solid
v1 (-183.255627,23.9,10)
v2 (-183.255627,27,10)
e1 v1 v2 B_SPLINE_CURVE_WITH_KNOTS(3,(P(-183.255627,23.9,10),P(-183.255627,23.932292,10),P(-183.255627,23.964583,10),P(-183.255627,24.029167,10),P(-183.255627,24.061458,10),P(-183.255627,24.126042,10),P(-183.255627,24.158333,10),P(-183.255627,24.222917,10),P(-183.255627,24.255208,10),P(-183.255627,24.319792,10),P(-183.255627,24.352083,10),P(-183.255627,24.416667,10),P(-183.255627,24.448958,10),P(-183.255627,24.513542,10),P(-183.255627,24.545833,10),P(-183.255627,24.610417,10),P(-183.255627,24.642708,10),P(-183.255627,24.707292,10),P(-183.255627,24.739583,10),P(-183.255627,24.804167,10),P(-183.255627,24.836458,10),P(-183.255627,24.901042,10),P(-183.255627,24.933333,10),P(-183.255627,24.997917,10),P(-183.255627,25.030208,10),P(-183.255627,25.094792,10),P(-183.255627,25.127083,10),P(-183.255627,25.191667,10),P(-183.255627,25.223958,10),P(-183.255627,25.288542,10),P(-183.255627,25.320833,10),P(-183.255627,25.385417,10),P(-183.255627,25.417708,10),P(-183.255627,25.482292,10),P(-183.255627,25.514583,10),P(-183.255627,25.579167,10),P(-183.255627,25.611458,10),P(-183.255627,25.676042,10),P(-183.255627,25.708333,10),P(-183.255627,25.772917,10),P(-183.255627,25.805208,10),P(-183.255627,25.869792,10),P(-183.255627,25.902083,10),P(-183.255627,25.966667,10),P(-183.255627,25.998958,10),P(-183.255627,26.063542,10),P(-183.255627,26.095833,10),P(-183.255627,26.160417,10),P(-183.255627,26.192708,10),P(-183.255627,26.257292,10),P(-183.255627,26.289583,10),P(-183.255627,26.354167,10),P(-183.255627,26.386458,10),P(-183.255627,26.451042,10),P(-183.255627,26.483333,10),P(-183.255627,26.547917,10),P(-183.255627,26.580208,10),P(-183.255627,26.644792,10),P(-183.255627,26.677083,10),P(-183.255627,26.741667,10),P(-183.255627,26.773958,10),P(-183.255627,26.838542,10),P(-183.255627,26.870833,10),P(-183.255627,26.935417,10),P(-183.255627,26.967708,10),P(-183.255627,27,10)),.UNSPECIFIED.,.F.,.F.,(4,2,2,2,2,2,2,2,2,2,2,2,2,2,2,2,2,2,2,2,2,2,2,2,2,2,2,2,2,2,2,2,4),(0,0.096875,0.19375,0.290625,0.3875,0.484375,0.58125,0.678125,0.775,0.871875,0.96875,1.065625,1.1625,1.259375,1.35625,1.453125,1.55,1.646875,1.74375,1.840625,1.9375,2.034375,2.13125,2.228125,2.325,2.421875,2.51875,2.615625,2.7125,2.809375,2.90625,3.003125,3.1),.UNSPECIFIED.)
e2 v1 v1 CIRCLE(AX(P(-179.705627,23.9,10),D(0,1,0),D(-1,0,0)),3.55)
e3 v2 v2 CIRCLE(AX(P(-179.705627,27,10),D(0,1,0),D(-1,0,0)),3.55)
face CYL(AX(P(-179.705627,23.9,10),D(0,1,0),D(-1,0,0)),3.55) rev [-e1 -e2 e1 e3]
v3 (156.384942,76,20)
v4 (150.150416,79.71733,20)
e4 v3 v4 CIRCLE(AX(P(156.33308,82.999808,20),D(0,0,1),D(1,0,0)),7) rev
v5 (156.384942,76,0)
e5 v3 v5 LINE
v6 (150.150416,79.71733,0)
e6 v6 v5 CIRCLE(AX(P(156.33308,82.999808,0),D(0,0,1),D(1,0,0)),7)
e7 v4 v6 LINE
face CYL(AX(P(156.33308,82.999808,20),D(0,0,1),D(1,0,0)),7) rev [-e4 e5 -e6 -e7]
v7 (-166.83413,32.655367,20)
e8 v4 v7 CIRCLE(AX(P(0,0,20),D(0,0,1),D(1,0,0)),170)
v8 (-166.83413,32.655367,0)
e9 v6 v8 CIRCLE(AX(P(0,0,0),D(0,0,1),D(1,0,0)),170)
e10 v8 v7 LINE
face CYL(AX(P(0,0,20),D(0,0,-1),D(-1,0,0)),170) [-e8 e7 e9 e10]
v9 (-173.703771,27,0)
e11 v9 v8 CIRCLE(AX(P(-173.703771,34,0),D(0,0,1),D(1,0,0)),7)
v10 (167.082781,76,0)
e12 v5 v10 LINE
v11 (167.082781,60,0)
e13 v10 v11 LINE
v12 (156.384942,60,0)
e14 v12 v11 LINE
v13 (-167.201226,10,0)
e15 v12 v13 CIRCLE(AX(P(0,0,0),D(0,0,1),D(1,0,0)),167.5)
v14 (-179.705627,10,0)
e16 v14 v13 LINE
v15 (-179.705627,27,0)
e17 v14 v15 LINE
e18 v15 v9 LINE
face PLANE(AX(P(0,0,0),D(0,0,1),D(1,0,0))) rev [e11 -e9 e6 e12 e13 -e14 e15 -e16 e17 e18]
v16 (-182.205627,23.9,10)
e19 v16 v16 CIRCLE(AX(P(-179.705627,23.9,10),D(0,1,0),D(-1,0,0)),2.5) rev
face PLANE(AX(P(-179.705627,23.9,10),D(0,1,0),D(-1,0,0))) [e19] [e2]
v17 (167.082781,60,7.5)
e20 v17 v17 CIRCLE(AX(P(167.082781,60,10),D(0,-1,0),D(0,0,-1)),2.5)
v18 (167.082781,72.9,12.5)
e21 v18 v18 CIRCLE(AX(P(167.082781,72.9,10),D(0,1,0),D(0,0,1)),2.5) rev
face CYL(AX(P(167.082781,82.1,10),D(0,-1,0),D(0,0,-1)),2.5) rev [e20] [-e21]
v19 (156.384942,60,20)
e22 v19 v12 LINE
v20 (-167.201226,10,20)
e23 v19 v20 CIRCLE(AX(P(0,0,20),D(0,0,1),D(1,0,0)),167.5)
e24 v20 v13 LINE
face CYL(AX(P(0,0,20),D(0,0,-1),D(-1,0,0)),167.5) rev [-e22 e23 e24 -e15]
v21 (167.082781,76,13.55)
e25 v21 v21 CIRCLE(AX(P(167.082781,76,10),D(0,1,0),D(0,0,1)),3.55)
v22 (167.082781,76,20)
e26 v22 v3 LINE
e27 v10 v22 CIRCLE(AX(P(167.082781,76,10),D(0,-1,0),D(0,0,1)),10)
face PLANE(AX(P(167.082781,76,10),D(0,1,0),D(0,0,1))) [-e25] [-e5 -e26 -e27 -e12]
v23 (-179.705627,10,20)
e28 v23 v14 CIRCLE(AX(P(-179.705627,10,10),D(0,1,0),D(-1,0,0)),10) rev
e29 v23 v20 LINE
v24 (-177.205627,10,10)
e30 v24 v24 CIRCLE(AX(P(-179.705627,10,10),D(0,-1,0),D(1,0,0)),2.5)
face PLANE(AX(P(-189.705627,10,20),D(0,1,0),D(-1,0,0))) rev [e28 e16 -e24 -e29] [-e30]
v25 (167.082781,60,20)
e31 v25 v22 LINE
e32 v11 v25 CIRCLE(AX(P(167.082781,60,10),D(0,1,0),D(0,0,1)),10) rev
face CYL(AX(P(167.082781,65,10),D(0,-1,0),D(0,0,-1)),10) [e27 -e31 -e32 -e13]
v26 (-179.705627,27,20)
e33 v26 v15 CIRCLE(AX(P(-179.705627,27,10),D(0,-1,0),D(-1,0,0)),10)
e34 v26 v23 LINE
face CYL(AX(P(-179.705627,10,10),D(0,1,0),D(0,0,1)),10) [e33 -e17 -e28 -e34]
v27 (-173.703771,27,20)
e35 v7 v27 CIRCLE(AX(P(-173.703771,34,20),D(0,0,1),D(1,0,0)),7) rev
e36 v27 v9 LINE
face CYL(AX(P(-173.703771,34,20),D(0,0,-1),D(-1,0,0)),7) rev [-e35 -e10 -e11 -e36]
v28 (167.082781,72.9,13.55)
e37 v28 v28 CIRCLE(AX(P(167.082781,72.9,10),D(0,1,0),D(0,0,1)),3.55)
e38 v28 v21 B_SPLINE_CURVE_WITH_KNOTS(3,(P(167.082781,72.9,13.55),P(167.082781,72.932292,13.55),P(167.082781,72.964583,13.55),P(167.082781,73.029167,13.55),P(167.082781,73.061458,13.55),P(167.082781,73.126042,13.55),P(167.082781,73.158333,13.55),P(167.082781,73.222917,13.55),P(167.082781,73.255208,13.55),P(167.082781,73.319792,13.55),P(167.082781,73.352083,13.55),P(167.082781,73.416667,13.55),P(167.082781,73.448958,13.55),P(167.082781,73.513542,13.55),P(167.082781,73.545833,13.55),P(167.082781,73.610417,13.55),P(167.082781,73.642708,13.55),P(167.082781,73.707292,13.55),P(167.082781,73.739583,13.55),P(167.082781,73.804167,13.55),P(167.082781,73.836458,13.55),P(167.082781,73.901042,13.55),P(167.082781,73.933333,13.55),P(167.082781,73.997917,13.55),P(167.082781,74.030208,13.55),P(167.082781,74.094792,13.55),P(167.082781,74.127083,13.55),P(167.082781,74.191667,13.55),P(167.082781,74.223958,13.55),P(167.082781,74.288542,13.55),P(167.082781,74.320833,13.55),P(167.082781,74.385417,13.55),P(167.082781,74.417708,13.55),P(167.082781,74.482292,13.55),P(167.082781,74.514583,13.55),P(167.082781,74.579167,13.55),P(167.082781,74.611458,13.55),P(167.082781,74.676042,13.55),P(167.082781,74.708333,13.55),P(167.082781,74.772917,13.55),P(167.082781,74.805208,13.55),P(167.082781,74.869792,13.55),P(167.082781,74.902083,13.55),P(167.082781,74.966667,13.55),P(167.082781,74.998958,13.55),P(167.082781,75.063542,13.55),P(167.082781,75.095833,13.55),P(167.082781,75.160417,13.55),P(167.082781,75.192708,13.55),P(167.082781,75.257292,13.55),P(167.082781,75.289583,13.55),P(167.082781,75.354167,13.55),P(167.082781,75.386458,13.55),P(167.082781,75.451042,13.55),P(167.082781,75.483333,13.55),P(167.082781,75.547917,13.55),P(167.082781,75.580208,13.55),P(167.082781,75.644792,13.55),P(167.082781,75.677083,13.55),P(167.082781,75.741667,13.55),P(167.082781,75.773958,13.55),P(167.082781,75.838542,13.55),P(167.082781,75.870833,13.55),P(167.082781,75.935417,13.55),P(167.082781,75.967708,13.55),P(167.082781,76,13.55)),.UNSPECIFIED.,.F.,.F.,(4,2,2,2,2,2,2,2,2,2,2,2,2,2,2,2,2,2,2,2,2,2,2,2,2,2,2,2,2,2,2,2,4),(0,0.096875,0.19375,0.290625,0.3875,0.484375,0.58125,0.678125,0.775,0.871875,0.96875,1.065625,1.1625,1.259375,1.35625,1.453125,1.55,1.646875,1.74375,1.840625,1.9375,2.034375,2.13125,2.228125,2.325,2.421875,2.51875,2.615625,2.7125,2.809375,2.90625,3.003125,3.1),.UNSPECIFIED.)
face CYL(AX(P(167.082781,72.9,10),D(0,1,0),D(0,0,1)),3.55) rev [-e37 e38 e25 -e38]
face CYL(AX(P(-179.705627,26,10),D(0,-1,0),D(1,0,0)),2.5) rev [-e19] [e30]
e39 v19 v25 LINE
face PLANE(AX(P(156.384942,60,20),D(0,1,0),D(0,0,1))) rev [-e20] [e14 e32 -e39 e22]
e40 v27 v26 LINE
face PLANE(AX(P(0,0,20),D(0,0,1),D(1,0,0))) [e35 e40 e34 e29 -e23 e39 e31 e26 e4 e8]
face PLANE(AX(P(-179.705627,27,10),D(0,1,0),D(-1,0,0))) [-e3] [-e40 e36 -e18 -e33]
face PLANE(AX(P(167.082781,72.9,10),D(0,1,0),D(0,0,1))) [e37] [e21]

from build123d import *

# Parameters (mm, degrees)
RESSALTO_EXTRUS_O6_DEPTH  = 20
FILETE4_R                 = 10
FILETE5_R                 = 10
RESSALTO_EXTRUS_O14_DEPTH = 17
RESSALTO_EXTRUS_O15_DEPTH = 16
FILETE6_R                 = 7
FILETE7_R                 = 7
ESBO_O25_R                = 2.5
CORTE_EXTRUS_O1_DEPTH     = 16
ESBO_O27_R                = 2.5
CORTE_EXTRUS_O2_DEPTH     = 18
ESBO_O28_R                = 3.55
CORTE_EXTRUS_O3_DEPTH     = 3.1
ESBO_O29_R                = 2.5
CORTE_EXTRUS_O4_DEPTH     = 22.1
ESBO_O30_R                = 3.55
CORTE_EXTRUS_O5_DEPTH     = 3.1


# Some blends are built 0.0001 mm under size
with BuildPart() as part:
    # Esboço2 → Ressalto-extrusão6 (new body)
    with BuildSketch(Plane.XY):
        with BuildLine():
            Line((157.082780724, 65), (177.082780724, 65))
            Line((177.082780724, 65), (177.082780724, 60))
            Line((177.082780724, 60), (156.38494173, 60))
            ThreePointArc((156.38494173, 60), (-25.578272063, 165.535500719), (-167.201226072, 10))
            Line((-167.201226072, 10), (-189.705627485, 10))
            Line((-189.705627485, 10), (-189.705627485, 15))
            Line((-189.705627485, 15), (-169.336942219, 15))
            ThreePointArc((-169.336942219, 15), (-25.739874096, 168.040051421), (157.082780724, 65))
        make_face()
    extrude(amount=RESSALTO_EXTRUS_O6_DEPTH)

    # Filete4
    filete4_edges = [part.edges().sort_by_distance(p)[0] for p in [
        (177.082780724, 62.5, 0),
        (177.082780724, 62.5, 20),
    ]]
    fillet(filete4_edges, radius=FILETE4_R - 0.0001)  # a hair under: the kernel refuses the full size

    # Filete5
    filete5_edges = [part.edges().sort_by_distance(p)[0] for p in [
        (-189.705627485, 12.5, 0),
        (-189.705627485, 12.5, 20),
    ]]
    fillet(filete5_edges, radius=FILETE5_R - 0.0001)  # a hair under: the kernel refuses the full size

    # Esboço20 → Ressalto-extrusão14 (add)
    with BuildSketch(Plane.XZ.offset(-10)):
        with BuildLine():
            Line((-167.201226072, 20), (-167.201226072, 0))
            Line((-167.201226072, 0), (-179.705627485, 0))
            ThreePointArc((-179.705627485, 0), (-186.776695297, 2.928932188), (-189.705627485, 10))
            ThreePointArc((-189.705627485, 10), (-186.776695297, 17.071067812), (-179.705627485, 20))
            Line((-179.705627485, 20), (-167.201226072, 20))
        make_face()
    extrude(amount=-RESSALTO_EXTRUS_O14_DEPTH)

    # Esboço21 → Ressalto-extrusão15 (add)
    with BuildSketch(Plane.XZ.offset(-60)):
        with BuildLine():
            Line((156.38494173, 20), (156.38494173, 0))
            Line((156.38494173, 0), (167.082780724, 0))
            ThreePointArc((167.082780724, 0), (174.153848536, 2.928932188), (177.082780724, 10))
            ThreePointArc((177.082780724, 10), (174.153848536, 17.071067812), (167.082780724, 20))
            Line((167.082780724, 20), (156.38494173, 20))
        make_face()
    extrude(amount=-RESSALTO_EXTRUS_O15_DEPTH)

    # Filete6
    # the kernel refuses this fillet: 7 mm, written as the material it adds along each edge
    with BuildSketch(Plane(origin=(156.38494173, 66.66145813, 20), x_dir=(0, 1, 0), z_dir=(0, 0, -1))) as filete6_piece_1:
        with BuildLine():
            CenterArc((16.33834975, -0.051861764), FILETE6_R, 179.575501806, 62.459929256)
            Line((13.055871472, -6.234525943), (12.990221907, -6.358179227))
            ThreePointArc((12.990221907, -6.358179227), (6.533962206, -3.104642795), (-0.054897671, -0.128787599))
            Line((-0.054897671, -0.128787599), (0, 0.14))
            ThreePointArc((0, 0.14), (4.669270935, 0.14), (9.198545713, 0.001037235))
            Line((9.198545713, 0.001037235), (9.33854187, 0))
        make_face()
    extrude(amount=20)

    # Filete7
    filete7_edges = [part.edges().sort_by_distance(p)[0] for p in [
        (-167.842187784, 27, 10),
    ]]
    fillet(filete7_edges, radius=FILETE7_R)

    # Esboço25 → Corte-extrusão1 (cut)
    with BuildSketch(Plane.XZ.offset(-10)):
        with Locations((-179.705627485, 10)):
            Circle(ESBO_O25_R)
    extrude(amount=-CORTE_EXTRUS_O1_DEPTH, mode=Mode.SUBTRACT)

    # Esboço27 → Corte-extrusão2 (cut)
    with BuildSketch(Plane.XZ.offset(-10)):
        with Locations((-179.705627485, 10)):
            Circle(ESBO_O27_R)
    extrude(amount=-CORTE_EXTRUS_O2_DEPTH, mode=Mode.SUBTRACT)

    # Esboço28 → Corte-extrusão3 (cut)
    with BuildSketch(Plane(origin=(0, 27, 0), x_dir=(1, 0, 0), z_dir=(0, 1, 0))):
        with Locations(Location((-179.705627485, -10, 0), (0, 0, 180))):
            Circle(ESBO_O28_R)
    extrude(amount=-CORTE_EXTRUS_O3_DEPTH, mode=Mode.SUBTRACT)

    # Esboço29 → Corte-extrusão4 (cut)
    with BuildSketch(Plane.XZ.offset(-60)):
        with Locations(Location((167.082780724, 10, 0), (0, 0, 270))):
            Circle(ESBO_O29_R)
    extrude(amount=-CORTE_EXTRUS_O4_DEPTH, mode=Mode.SUBTRACT)

    # Esboço30 → Corte-extrusão5 (cut)
    with BuildSketch(Plane(origin=(0, 76, 0), x_dir=(1, 0, 0), z_dir=(0, 1, 0))):
        with Locations(Location((167.082780724, -10, 0), (0, 0, 270))):
            Circle(ESBO_O30_R)
    extrude(amount=-CORTE_EXTRUS_O5_DEPTH, mode=Mode.SUBTRACT)


solid = part.part
